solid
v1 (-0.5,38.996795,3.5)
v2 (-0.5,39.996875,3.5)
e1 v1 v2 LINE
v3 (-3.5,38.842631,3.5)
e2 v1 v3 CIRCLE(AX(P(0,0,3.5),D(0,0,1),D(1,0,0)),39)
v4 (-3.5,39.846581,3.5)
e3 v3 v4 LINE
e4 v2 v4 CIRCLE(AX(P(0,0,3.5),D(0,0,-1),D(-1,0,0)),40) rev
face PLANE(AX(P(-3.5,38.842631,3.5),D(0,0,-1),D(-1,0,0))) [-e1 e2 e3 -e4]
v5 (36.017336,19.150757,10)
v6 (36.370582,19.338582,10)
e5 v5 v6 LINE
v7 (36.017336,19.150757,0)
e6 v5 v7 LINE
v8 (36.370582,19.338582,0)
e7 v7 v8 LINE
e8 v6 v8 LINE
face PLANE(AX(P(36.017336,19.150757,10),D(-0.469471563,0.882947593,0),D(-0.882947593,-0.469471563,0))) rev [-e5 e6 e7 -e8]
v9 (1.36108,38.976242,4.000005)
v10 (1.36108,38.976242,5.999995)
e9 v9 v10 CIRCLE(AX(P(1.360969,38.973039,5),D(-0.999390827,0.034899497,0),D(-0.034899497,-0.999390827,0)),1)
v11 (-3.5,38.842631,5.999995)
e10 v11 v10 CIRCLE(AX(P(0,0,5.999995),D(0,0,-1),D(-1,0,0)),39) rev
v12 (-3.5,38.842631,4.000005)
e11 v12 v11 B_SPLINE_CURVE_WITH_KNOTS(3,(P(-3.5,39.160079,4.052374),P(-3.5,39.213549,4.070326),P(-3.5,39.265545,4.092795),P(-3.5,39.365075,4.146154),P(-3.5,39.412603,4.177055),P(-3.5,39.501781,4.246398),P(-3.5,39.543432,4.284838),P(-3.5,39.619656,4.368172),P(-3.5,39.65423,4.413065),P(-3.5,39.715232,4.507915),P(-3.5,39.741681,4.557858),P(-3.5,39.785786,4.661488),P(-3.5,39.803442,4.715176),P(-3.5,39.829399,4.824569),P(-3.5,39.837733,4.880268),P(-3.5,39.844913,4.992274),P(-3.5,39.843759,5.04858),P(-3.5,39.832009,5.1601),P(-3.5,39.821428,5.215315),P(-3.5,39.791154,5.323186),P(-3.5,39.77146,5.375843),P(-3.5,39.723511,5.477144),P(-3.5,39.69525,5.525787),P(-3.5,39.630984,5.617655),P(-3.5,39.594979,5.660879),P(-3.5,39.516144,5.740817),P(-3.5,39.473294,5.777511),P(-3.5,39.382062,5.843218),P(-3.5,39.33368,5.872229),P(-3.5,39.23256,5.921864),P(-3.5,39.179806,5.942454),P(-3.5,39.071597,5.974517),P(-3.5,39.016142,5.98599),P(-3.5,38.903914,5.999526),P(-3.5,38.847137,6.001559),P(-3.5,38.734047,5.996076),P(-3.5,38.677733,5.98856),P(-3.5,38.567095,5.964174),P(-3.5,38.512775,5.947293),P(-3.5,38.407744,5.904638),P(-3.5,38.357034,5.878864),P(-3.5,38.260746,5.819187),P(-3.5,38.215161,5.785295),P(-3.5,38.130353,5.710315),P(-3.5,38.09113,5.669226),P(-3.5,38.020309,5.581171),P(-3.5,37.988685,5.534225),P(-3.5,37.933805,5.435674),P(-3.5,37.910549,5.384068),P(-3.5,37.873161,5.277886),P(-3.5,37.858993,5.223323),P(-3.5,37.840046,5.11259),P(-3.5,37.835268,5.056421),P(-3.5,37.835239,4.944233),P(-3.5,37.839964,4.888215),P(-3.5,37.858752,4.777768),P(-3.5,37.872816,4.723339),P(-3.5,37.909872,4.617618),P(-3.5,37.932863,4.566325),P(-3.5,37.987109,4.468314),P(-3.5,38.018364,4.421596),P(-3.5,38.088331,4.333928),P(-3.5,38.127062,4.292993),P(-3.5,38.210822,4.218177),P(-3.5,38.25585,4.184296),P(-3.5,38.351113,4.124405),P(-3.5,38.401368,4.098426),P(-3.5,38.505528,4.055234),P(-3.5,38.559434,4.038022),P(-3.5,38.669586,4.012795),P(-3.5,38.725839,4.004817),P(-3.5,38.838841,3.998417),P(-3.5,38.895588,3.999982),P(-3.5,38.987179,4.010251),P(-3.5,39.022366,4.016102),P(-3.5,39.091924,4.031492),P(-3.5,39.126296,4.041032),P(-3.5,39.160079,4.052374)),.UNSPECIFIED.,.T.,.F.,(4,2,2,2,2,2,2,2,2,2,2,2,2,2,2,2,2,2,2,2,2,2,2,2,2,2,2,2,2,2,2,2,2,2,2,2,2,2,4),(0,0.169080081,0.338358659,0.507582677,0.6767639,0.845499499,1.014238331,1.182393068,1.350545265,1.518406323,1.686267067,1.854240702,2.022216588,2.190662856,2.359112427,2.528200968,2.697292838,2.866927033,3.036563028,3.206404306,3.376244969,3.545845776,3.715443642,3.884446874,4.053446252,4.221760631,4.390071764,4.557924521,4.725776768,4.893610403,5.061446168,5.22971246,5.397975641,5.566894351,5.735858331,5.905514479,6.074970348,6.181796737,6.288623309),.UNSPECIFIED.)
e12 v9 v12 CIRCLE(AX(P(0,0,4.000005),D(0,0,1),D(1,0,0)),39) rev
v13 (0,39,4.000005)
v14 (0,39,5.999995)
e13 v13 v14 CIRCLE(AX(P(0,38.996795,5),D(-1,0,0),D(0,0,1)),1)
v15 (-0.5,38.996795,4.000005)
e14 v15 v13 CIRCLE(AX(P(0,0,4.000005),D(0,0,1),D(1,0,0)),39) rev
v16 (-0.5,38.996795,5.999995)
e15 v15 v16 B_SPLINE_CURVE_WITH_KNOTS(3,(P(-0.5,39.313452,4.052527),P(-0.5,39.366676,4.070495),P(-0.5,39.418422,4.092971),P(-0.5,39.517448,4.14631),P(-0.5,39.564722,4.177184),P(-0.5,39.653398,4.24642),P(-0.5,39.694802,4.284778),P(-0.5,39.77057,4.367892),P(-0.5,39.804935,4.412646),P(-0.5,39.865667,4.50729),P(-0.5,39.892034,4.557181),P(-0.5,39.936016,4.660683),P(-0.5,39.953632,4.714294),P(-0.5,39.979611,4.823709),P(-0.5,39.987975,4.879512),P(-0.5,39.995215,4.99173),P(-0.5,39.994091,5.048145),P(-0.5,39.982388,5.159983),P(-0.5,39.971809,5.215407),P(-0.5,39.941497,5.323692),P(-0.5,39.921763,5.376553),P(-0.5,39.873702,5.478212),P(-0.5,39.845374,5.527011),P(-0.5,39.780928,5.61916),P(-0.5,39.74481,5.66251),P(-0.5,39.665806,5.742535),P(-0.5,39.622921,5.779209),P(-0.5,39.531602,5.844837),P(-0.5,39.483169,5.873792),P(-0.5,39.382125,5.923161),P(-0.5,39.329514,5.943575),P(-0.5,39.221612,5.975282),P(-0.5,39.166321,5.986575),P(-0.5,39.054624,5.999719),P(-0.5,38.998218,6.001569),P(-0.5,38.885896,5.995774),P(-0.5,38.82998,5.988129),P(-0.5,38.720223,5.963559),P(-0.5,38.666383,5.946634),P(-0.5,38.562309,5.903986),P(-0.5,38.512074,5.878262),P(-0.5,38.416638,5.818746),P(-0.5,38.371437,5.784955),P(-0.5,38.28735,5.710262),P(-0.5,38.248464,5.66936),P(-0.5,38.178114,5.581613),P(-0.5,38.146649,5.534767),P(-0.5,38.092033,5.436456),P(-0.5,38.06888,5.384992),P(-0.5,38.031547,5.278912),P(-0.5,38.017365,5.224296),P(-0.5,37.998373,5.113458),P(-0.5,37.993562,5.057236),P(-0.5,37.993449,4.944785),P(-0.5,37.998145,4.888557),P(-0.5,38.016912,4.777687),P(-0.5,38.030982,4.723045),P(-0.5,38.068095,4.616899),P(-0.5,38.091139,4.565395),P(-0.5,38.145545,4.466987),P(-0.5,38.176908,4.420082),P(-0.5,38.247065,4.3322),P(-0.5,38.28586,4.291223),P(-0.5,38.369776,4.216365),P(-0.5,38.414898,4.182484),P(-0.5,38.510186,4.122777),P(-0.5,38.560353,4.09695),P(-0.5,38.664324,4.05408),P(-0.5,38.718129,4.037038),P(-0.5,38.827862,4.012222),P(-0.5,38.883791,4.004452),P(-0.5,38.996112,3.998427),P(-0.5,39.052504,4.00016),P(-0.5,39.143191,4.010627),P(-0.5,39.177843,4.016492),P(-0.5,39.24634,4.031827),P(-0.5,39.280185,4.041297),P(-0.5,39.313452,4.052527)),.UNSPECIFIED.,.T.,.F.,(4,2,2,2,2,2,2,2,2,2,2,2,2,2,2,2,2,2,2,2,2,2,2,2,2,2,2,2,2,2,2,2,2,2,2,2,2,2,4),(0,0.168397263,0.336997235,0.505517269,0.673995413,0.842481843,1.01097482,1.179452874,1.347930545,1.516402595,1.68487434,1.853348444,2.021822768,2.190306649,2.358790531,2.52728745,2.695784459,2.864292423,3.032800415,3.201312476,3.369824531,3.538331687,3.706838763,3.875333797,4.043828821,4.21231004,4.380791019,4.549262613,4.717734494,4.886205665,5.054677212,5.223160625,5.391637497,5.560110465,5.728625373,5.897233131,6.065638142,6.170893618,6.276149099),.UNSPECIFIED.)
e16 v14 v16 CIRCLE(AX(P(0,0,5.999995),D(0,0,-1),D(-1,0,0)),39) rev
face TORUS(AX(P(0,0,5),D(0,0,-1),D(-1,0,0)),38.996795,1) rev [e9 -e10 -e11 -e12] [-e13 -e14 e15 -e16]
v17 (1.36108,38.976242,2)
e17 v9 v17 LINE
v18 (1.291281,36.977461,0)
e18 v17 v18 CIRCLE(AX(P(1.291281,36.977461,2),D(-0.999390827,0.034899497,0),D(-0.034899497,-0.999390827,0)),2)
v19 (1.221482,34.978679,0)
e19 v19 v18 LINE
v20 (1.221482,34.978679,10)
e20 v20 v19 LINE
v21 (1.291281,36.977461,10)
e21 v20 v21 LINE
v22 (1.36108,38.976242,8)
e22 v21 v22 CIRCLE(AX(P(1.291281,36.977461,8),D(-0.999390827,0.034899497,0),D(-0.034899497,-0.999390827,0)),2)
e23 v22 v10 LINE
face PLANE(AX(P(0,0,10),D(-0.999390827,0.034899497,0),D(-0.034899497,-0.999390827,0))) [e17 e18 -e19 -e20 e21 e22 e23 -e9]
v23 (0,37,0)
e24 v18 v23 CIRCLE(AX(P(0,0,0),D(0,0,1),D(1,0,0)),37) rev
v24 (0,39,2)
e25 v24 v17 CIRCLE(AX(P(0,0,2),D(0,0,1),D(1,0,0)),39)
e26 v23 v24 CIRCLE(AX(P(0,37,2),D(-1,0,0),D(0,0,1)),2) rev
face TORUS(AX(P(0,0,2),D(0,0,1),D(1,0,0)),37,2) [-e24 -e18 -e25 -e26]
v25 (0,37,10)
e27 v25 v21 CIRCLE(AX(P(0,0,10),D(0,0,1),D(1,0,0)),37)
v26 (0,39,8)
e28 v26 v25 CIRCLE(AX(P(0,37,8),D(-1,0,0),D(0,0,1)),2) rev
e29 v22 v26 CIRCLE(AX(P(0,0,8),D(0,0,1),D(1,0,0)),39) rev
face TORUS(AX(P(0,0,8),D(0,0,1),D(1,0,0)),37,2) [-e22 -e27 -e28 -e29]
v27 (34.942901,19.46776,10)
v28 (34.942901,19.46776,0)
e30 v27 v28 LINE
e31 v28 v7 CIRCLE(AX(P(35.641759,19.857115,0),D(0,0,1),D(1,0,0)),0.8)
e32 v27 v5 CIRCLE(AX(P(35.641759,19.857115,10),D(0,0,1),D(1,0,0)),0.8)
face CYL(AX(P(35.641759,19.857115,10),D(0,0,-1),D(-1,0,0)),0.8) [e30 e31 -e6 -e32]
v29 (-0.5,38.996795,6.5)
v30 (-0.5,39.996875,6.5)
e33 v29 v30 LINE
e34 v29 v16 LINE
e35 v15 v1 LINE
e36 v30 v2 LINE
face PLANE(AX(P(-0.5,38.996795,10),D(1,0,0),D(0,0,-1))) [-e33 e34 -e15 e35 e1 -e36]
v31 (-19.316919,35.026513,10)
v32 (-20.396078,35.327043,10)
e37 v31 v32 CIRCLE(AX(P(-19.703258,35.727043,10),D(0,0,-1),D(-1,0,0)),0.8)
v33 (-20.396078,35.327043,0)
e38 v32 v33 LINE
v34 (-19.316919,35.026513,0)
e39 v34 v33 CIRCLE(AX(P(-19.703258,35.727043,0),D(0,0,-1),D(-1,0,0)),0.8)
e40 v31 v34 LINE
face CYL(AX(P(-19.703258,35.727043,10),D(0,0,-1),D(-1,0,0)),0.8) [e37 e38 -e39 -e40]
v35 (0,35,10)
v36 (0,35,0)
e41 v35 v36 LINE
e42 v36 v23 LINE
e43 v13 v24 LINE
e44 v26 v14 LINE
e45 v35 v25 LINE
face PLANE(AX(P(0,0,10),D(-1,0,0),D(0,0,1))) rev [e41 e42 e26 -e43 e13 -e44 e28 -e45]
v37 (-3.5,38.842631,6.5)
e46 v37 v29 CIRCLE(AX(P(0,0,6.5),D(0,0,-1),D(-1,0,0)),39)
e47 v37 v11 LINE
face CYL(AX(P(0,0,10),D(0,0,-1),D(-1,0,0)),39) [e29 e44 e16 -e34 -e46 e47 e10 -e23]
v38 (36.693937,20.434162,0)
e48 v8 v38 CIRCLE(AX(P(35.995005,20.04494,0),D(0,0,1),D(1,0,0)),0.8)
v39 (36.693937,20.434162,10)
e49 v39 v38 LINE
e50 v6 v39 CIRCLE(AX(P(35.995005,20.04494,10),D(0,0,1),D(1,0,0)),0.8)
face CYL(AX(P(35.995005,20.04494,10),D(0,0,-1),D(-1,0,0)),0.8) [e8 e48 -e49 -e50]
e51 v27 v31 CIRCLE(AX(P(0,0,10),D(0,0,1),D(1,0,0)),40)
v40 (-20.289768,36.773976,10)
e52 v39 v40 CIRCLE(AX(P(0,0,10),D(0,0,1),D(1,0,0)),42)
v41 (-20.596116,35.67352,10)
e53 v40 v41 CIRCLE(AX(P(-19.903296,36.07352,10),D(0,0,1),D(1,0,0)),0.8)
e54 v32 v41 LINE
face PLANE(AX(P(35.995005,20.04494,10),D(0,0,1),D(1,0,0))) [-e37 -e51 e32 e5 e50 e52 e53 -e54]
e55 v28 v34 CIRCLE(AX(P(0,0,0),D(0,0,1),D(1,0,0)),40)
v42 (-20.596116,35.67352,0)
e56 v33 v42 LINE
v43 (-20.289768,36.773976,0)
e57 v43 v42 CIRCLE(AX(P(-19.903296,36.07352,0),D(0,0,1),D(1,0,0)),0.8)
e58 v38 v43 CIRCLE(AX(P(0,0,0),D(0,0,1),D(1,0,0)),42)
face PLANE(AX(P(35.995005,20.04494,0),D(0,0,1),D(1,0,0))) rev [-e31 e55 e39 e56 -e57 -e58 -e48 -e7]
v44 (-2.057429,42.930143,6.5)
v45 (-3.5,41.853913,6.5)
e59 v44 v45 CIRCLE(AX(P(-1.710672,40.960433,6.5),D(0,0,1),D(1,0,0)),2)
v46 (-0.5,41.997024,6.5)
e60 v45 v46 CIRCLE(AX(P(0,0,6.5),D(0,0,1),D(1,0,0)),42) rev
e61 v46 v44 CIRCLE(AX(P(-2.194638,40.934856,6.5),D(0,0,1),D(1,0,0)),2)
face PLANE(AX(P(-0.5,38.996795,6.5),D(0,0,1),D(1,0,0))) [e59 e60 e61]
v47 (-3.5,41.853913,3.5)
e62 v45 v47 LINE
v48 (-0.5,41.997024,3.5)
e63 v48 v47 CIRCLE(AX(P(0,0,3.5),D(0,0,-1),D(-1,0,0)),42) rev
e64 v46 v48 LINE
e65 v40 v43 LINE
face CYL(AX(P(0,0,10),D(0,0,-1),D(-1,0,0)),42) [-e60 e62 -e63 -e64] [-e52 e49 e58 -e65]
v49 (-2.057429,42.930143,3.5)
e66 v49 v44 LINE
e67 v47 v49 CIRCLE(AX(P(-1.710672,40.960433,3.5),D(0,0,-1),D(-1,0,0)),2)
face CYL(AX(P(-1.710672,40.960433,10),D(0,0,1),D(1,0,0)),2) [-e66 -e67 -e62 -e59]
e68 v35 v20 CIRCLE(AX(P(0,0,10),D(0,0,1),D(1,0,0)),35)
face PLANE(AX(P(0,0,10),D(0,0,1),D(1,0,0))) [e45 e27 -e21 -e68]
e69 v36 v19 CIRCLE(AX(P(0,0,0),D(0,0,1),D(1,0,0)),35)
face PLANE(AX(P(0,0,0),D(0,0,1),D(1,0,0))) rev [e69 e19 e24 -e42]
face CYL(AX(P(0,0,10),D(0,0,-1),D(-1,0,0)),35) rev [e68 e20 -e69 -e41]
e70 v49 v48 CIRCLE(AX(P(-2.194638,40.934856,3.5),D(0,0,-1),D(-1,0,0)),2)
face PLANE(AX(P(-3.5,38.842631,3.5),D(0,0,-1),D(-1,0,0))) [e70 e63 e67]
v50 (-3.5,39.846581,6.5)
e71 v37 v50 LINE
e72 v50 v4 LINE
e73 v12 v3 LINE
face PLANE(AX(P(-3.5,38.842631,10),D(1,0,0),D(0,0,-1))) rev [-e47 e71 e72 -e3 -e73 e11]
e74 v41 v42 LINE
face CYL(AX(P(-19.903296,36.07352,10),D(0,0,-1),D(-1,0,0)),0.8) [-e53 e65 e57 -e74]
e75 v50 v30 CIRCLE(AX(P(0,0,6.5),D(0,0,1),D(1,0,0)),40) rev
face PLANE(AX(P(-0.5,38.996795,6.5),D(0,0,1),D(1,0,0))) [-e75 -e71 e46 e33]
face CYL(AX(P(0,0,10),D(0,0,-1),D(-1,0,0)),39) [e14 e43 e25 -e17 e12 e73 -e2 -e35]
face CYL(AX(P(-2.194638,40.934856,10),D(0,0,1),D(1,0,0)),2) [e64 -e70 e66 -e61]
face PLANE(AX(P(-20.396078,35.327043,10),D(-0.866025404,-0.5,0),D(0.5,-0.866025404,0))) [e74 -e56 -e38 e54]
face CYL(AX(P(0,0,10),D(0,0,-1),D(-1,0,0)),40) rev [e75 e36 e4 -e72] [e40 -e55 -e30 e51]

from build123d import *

# Parameters (mm, degrees)
BOSS_EXTRUDE1_DEPTH   = 10
BOSS_EXTRUDE1_2_DEPTH = 10
BOSS_EXTRUDE2_START   = 3.5
BOSS_EXTRUDE2_DEPTH   = 3
FILLET1_R             = 2
SKETCH4_R             = 1
FILLET2_R             = 2


# Read off the part's stored shape, not the designer's step: Boss-Extrude2
with BuildPart() as part:
    # Sketch1 → Boss-Extrude1 (new body)
    with BuildSketch(Plane.XY):
        with BuildLine():
            ThreePointArc((35, 0), (-24.748737342, -24.748737342), (0, 35))
            Line((0, 35), (0, 39))
            ThreePointArc((0, 39), (-27.577164466, -27.577164466), (39, 0))
            ThreePointArc((39, 0), (28.054252213, 27.091676448), (1.361080371, 38.976242254))
            Line((1.361080371, 38.976242254), (1.221482385, 34.978678946))
            ThreePointArc((1.221482385, 34.978678946), (25.176893012, 24.313042966), (35, 0))
        make_face()
    extrude(amount=BOSS_EXTRUDE1_DEPTH)



with BuildPart() as body_2:
    # Sketch1 → Boss-Extrude1 2 (new body)
    with BuildSketch(Plane.XY):
        with BuildLine():
            ThreePointArc((36.693937221, 20.434161867), (11.576768944, 40.372991229), (-20.289767579, 36.773976282))
            ThreePointArc((-20.289767579, 36.773976282), (-20.673989714, 36.288067757), (-20.596116139, 35.673519591))
            Line((-20.596116139, 35.673519591), (-20.396078054, 35.327043465))
            ThreePointArc((-20.396078054, 35.327043465), (-19.917879268, 34.956369996), (-19.316919344, 35.026513201))
            ThreePointArc((-19.316919344, 35.026513201), (11.025494233, 38.450467838), (34.942900778, 19.467760149))
            ThreePointArc((34.942900778, 19.467760149), (35.415373462, 19.089815097), (36.017336044, 19.150757278))
            Line((36.017336044, 19.150757278), (36.370582334, 19.338581662))
            ThreePointArc((36.370582334, 19.338581662), (36.762283783, 19.818481357), (36.693937221, 20.434161867))
        make_face()
    extrude(amount=BOSS_EXTRUDE1_2_DEPTH)


with BuildPart() as part_1:
    add(part.part)

    add(body_2.part)  # Boss-Extrude2 merges body 2
    # Boss-Extrude2 outline → Boss-Extrude2 (add)
    with BuildSketch(Plane.XY.offset(BOSS_EXTRUDE2_START)):
        with BuildLine():
            ThreePointArc((-3.5, 38.842631218), (-2.001484848, 38.948607913), (-0.5, 38.99679474))
            Line((-0.5, 38.99679474), (-0.5, 39.996874878))
            ThreePointArc((-0.5, 39.996874878), (-2.001411272, 39.949898034), (-3.5, 39.846580782))
            Line((-3.5, 39.846580782), (-3.5, 38.842631218))
        make_face()
        with BuildLine():
            ThreePointArc((-3.5, 41.853912601), (-2.00127964, 41.952292902), (-0.5, 41.997023704))
            Line((-0.5, 41.997023704), (-0.5, 42.99679474))
            ThreePointArc((-0.5, 42.99679474), (-2.001484848, 42.948607914), (-3.5, 42.842631219))
            Line((-3.5, 42.842631219), (-3.5, 41.853912601))
        make_face()
    extrude(amount=BOSS_EXTRUDE2_DEPTH)

    # Fillet1
    # the kernel refuses this fillet: 2 mm, written as the material it takes off along each edge
    with BuildSketch(Plane(origin=(-0.5, 42.99679474, -1.036121559), x_dir=(0, -1, 0), z_dir=(0, 0, 1))) as fillet1_piece_1:
        with BuildLine():
            CenterArc((2.061939079, -1.694638323), FILLET1_R, 122.078727106, 61.321742155)
            Line((0.065460395, -1.813267422), (0.025530821, -1.815640004))
            ThreePointArc((0.025530821, -1.815640004), (-0.01779032, -0.908457542), (-0.039996713, -0.00051282))
            Line((-0.039996713, -0.00051282), (0, 0.04))
            ThreePointArc((0, 0.04), (0.499885518, 0.04), (0.978527675, 0.033892766))
            Line((0.978527675, 0.033892766), (0.999771036, 0))
        make_face()
    extrude(amount=12.072243117, mode=Mode.SUBTRACT)
    with BuildSketch(Plane(origin=(-3.5, 42.842631219, -0.751991115), x_dir=(0, -1, 0), z_dir=(0, 0, 1))) as fillet1_piece_2:
        with BuildLine():
            CenterArc((1.882198311, 1.789327817), FILLET1_R, 182.649979703, 60.815312802)
            Line((-0.115662927, 1.696859051), (-0.155620152, 1.695009676))
            ThreePointArc((-0.155620152, 1.695009676), (-0.10699, 0.845078734), (-0.039838596, -0.003589744))
            Line((-0.039838596, -0.003589744), (0, -0.04))
            ThreePointArc((0, -0.04), (0.494359309, -0.04), (0.970849024, -0.035786556))
            Line((0.970849024, -0.035786556), (0.988718618, 0))
        make_face()
    extrude(amount=11.503982231, mode=Mode.SUBTRACT)

    # Sketch4 → Cut-Revolve1 (revolve, cut)
    with BuildSketch(Plane(origin=(0, 0, 0), x_dir=(0, 0, -1), z_dir=(1, 0, 0)), mode=Mode.PRIVATE) as cut_revolve1_sk:
        with Locations((-5, 38.99679474)):
            Circle(SKETCH4_R)
    revolve(cut_revolve1_sk.sketch.rotate(Axis((0, 0, 0), (0, 0, 1)), 2.941718787), axis=Axis((0, 0, 0), (0, 0, 1)), mode=Mode.SUBTRACT)

    # Fillet2
    fillet2_edges = [part_1.edges().sort_by_distance(p)[0] for p in [
        (-27.577164466, -27.577164466, 10),
        (-27.577164466, -27.577164466, 0),
    ]]
    fillet(fillet2_edges, radius=FILLET2_R)


solid = part_1.part
